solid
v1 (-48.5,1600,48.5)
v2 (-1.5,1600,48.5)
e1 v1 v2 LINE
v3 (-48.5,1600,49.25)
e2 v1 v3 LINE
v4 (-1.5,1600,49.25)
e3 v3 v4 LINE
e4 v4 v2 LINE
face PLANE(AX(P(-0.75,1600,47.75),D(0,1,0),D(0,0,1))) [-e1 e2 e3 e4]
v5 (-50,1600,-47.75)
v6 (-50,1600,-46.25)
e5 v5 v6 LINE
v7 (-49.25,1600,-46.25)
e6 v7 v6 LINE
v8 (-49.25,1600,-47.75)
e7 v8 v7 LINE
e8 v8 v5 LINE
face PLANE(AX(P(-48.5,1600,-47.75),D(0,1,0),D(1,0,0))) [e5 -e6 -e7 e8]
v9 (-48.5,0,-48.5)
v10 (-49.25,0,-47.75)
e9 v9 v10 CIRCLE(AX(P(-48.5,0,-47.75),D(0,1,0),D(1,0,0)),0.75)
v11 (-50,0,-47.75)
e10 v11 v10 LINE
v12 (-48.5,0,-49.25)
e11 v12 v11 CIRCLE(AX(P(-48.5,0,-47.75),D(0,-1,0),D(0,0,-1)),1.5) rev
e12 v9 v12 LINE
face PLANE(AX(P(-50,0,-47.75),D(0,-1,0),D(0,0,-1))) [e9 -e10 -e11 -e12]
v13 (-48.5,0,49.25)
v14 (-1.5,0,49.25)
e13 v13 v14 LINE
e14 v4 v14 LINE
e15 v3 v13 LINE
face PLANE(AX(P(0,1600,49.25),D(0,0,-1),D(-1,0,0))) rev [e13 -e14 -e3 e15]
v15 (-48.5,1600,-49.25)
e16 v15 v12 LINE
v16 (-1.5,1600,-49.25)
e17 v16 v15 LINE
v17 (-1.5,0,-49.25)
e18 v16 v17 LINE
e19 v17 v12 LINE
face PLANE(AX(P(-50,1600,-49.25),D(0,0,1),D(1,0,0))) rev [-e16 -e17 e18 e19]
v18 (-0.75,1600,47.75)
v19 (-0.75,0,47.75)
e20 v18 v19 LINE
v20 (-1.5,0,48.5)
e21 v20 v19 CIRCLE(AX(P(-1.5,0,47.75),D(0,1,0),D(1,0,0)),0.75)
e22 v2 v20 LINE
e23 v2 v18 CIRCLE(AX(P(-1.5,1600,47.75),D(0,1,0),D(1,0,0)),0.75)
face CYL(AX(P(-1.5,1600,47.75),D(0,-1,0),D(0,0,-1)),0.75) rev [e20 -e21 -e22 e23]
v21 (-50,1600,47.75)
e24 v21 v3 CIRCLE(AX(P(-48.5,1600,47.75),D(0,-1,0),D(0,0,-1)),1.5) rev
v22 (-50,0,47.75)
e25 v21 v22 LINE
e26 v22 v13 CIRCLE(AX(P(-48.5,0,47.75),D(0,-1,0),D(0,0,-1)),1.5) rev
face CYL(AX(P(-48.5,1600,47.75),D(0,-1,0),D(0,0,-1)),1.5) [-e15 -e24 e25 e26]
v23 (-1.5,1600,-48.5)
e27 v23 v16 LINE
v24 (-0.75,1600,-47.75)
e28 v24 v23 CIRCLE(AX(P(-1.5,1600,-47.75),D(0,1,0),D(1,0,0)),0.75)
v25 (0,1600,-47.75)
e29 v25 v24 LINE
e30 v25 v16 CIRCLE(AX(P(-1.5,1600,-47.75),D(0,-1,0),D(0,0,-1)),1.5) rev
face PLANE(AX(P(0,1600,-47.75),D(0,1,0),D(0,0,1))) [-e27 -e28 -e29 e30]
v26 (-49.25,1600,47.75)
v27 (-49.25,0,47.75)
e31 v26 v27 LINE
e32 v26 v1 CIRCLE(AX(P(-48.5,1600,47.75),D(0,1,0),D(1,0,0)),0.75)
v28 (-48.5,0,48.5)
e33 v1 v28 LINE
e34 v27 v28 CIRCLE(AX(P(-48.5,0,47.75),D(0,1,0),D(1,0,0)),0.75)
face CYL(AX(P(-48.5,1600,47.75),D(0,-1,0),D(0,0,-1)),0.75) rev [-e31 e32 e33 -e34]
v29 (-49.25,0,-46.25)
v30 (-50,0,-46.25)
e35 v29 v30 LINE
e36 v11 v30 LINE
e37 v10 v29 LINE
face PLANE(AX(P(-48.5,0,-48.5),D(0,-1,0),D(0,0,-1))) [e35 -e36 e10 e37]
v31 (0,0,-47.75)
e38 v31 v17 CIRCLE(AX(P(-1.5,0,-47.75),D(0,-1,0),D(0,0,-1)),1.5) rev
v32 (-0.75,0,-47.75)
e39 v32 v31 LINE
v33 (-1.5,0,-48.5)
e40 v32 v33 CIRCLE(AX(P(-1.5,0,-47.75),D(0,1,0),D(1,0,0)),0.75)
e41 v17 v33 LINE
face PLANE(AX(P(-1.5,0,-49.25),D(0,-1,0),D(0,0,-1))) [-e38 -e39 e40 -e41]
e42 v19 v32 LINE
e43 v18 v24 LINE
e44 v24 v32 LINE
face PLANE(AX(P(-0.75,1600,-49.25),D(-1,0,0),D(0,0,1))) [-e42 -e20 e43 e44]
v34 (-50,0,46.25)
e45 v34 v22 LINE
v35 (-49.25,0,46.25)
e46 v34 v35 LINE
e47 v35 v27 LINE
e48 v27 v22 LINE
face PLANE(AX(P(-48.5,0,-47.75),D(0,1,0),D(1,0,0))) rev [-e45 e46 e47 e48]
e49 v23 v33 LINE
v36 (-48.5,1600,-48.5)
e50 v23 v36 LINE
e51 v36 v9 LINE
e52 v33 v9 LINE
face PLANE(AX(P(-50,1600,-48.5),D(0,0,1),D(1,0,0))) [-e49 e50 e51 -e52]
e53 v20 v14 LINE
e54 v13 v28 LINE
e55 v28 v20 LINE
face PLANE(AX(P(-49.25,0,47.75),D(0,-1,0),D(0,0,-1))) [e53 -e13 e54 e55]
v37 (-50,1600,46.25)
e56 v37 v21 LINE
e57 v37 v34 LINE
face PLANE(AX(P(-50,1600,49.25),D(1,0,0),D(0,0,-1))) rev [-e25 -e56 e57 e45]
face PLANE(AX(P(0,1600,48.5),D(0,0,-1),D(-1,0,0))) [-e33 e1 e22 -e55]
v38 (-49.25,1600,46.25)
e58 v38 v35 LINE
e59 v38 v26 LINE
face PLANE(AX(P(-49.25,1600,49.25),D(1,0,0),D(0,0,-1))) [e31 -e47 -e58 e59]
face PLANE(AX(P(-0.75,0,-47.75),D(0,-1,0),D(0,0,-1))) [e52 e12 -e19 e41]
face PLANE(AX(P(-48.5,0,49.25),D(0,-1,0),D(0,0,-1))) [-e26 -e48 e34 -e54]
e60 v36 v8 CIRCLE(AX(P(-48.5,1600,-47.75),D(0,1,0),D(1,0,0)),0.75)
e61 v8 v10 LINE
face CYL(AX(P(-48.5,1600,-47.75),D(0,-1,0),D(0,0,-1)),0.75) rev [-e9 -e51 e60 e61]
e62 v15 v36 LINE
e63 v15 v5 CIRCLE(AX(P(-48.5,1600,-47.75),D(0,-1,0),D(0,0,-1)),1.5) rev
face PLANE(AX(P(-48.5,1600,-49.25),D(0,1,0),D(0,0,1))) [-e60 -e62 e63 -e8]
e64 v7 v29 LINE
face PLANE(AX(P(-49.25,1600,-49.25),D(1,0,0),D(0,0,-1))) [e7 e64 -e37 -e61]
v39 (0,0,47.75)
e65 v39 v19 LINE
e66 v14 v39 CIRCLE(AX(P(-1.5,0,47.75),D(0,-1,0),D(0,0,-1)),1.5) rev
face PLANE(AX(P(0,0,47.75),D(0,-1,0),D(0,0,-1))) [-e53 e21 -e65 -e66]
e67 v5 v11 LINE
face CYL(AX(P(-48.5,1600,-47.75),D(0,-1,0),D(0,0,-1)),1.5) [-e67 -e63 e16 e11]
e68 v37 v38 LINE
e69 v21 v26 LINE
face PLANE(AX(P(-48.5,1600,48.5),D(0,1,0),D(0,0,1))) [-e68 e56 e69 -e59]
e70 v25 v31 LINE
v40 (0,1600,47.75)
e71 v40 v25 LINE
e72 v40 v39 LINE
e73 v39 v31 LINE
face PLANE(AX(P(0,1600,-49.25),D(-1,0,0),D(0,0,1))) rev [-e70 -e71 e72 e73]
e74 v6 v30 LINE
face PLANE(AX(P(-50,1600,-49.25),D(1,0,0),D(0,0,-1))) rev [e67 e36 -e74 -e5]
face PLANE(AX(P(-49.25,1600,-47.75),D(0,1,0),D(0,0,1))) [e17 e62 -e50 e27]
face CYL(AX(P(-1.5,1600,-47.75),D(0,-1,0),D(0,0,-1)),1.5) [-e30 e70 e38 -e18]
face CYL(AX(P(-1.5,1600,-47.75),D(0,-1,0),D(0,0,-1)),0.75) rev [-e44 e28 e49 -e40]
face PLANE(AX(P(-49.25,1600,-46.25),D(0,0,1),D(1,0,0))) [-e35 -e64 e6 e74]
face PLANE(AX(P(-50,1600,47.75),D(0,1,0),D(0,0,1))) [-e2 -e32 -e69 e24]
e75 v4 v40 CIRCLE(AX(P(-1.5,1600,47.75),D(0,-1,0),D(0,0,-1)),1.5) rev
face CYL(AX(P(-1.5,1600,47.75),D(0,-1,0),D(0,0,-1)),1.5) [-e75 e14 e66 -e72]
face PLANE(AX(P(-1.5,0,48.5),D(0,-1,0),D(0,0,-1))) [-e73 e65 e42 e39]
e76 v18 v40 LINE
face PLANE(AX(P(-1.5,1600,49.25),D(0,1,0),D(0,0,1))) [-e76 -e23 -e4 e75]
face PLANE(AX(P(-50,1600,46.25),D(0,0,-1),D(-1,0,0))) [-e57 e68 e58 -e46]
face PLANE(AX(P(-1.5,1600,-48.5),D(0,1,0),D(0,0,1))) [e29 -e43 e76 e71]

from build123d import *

# Parameters (mm, degrees)
SM_BASE_FLANGE_1_DEPTH = 1600


# Sheet-metal steps are written as plain solids
with BuildPart() as part:
    # Sketch 1 → Базовая кромка1 (new body)
    with BuildSketch(Plane(origin=(0, 0, 0), x_dir=(1, 0, 0), z_dir=(0, 1, 0))):
        with BuildLine():
            Line((-50, 46.25), (-50, 47.75))
            ThreePointArc((-50, 47.75), (-49.560660172, 48.810660172), (-48.5, 49.25))
            Line((-48.5, 49.25), (-1.5, 49.25))
            ThreePointArc((-1.5, 49.25), (-0.439339828, 48.810660172), (0, 47.75))
            Line((0, 47.75), (0, -47.75))
            ThreePointArc((0, -47.75), (-0.439339828, -48.810660172), (-1.5, -49.25))
            Line((-1.5, -49.25), (-48.5, -49.25))
            ThreePointArc((-48.5, -49.25), (-49.560660172, -48.810660172), (-50, -47.75))
            Line((-50, -47.75), (-50, -46.25))
            Line((-50, -46.25), (-49.25, -46.25))
            Line((-49.25, -46.25), (-49.25, -47.75))
            ThreePointArc((-49.25, -47.75), (-49.030330086, -48.280330086), (-48.5, -48.5))
            Line((-48.5, -48.5), (-1.5, -48.5))
            ThreePointArc((-1.5, -48.5), (-0.969669914, -48.280330086), (-0.75, -47.75))
            Line((-0.75, -47.75), (-0.75, 47.75))
            ThreePointArc((-0.75, 47.75), (-0.969669914, 48.280330086), (-1.5, 48.5))
            Line((-1.5, 48.5), (-48.5, 48.5))
            ThreePointArc((-48.5, 48.5), (-49.030330086, 48.280330086), (-49.25, 47.75))
            Line((-49.25, 47.75), (-49.25, 46.25))
            Line((-49.25, 46.25), (-50, 46.25))
        make_face()
    extrude(amount=SM_BASE_FLANGE_1_DEPTH)


solid = part.part
